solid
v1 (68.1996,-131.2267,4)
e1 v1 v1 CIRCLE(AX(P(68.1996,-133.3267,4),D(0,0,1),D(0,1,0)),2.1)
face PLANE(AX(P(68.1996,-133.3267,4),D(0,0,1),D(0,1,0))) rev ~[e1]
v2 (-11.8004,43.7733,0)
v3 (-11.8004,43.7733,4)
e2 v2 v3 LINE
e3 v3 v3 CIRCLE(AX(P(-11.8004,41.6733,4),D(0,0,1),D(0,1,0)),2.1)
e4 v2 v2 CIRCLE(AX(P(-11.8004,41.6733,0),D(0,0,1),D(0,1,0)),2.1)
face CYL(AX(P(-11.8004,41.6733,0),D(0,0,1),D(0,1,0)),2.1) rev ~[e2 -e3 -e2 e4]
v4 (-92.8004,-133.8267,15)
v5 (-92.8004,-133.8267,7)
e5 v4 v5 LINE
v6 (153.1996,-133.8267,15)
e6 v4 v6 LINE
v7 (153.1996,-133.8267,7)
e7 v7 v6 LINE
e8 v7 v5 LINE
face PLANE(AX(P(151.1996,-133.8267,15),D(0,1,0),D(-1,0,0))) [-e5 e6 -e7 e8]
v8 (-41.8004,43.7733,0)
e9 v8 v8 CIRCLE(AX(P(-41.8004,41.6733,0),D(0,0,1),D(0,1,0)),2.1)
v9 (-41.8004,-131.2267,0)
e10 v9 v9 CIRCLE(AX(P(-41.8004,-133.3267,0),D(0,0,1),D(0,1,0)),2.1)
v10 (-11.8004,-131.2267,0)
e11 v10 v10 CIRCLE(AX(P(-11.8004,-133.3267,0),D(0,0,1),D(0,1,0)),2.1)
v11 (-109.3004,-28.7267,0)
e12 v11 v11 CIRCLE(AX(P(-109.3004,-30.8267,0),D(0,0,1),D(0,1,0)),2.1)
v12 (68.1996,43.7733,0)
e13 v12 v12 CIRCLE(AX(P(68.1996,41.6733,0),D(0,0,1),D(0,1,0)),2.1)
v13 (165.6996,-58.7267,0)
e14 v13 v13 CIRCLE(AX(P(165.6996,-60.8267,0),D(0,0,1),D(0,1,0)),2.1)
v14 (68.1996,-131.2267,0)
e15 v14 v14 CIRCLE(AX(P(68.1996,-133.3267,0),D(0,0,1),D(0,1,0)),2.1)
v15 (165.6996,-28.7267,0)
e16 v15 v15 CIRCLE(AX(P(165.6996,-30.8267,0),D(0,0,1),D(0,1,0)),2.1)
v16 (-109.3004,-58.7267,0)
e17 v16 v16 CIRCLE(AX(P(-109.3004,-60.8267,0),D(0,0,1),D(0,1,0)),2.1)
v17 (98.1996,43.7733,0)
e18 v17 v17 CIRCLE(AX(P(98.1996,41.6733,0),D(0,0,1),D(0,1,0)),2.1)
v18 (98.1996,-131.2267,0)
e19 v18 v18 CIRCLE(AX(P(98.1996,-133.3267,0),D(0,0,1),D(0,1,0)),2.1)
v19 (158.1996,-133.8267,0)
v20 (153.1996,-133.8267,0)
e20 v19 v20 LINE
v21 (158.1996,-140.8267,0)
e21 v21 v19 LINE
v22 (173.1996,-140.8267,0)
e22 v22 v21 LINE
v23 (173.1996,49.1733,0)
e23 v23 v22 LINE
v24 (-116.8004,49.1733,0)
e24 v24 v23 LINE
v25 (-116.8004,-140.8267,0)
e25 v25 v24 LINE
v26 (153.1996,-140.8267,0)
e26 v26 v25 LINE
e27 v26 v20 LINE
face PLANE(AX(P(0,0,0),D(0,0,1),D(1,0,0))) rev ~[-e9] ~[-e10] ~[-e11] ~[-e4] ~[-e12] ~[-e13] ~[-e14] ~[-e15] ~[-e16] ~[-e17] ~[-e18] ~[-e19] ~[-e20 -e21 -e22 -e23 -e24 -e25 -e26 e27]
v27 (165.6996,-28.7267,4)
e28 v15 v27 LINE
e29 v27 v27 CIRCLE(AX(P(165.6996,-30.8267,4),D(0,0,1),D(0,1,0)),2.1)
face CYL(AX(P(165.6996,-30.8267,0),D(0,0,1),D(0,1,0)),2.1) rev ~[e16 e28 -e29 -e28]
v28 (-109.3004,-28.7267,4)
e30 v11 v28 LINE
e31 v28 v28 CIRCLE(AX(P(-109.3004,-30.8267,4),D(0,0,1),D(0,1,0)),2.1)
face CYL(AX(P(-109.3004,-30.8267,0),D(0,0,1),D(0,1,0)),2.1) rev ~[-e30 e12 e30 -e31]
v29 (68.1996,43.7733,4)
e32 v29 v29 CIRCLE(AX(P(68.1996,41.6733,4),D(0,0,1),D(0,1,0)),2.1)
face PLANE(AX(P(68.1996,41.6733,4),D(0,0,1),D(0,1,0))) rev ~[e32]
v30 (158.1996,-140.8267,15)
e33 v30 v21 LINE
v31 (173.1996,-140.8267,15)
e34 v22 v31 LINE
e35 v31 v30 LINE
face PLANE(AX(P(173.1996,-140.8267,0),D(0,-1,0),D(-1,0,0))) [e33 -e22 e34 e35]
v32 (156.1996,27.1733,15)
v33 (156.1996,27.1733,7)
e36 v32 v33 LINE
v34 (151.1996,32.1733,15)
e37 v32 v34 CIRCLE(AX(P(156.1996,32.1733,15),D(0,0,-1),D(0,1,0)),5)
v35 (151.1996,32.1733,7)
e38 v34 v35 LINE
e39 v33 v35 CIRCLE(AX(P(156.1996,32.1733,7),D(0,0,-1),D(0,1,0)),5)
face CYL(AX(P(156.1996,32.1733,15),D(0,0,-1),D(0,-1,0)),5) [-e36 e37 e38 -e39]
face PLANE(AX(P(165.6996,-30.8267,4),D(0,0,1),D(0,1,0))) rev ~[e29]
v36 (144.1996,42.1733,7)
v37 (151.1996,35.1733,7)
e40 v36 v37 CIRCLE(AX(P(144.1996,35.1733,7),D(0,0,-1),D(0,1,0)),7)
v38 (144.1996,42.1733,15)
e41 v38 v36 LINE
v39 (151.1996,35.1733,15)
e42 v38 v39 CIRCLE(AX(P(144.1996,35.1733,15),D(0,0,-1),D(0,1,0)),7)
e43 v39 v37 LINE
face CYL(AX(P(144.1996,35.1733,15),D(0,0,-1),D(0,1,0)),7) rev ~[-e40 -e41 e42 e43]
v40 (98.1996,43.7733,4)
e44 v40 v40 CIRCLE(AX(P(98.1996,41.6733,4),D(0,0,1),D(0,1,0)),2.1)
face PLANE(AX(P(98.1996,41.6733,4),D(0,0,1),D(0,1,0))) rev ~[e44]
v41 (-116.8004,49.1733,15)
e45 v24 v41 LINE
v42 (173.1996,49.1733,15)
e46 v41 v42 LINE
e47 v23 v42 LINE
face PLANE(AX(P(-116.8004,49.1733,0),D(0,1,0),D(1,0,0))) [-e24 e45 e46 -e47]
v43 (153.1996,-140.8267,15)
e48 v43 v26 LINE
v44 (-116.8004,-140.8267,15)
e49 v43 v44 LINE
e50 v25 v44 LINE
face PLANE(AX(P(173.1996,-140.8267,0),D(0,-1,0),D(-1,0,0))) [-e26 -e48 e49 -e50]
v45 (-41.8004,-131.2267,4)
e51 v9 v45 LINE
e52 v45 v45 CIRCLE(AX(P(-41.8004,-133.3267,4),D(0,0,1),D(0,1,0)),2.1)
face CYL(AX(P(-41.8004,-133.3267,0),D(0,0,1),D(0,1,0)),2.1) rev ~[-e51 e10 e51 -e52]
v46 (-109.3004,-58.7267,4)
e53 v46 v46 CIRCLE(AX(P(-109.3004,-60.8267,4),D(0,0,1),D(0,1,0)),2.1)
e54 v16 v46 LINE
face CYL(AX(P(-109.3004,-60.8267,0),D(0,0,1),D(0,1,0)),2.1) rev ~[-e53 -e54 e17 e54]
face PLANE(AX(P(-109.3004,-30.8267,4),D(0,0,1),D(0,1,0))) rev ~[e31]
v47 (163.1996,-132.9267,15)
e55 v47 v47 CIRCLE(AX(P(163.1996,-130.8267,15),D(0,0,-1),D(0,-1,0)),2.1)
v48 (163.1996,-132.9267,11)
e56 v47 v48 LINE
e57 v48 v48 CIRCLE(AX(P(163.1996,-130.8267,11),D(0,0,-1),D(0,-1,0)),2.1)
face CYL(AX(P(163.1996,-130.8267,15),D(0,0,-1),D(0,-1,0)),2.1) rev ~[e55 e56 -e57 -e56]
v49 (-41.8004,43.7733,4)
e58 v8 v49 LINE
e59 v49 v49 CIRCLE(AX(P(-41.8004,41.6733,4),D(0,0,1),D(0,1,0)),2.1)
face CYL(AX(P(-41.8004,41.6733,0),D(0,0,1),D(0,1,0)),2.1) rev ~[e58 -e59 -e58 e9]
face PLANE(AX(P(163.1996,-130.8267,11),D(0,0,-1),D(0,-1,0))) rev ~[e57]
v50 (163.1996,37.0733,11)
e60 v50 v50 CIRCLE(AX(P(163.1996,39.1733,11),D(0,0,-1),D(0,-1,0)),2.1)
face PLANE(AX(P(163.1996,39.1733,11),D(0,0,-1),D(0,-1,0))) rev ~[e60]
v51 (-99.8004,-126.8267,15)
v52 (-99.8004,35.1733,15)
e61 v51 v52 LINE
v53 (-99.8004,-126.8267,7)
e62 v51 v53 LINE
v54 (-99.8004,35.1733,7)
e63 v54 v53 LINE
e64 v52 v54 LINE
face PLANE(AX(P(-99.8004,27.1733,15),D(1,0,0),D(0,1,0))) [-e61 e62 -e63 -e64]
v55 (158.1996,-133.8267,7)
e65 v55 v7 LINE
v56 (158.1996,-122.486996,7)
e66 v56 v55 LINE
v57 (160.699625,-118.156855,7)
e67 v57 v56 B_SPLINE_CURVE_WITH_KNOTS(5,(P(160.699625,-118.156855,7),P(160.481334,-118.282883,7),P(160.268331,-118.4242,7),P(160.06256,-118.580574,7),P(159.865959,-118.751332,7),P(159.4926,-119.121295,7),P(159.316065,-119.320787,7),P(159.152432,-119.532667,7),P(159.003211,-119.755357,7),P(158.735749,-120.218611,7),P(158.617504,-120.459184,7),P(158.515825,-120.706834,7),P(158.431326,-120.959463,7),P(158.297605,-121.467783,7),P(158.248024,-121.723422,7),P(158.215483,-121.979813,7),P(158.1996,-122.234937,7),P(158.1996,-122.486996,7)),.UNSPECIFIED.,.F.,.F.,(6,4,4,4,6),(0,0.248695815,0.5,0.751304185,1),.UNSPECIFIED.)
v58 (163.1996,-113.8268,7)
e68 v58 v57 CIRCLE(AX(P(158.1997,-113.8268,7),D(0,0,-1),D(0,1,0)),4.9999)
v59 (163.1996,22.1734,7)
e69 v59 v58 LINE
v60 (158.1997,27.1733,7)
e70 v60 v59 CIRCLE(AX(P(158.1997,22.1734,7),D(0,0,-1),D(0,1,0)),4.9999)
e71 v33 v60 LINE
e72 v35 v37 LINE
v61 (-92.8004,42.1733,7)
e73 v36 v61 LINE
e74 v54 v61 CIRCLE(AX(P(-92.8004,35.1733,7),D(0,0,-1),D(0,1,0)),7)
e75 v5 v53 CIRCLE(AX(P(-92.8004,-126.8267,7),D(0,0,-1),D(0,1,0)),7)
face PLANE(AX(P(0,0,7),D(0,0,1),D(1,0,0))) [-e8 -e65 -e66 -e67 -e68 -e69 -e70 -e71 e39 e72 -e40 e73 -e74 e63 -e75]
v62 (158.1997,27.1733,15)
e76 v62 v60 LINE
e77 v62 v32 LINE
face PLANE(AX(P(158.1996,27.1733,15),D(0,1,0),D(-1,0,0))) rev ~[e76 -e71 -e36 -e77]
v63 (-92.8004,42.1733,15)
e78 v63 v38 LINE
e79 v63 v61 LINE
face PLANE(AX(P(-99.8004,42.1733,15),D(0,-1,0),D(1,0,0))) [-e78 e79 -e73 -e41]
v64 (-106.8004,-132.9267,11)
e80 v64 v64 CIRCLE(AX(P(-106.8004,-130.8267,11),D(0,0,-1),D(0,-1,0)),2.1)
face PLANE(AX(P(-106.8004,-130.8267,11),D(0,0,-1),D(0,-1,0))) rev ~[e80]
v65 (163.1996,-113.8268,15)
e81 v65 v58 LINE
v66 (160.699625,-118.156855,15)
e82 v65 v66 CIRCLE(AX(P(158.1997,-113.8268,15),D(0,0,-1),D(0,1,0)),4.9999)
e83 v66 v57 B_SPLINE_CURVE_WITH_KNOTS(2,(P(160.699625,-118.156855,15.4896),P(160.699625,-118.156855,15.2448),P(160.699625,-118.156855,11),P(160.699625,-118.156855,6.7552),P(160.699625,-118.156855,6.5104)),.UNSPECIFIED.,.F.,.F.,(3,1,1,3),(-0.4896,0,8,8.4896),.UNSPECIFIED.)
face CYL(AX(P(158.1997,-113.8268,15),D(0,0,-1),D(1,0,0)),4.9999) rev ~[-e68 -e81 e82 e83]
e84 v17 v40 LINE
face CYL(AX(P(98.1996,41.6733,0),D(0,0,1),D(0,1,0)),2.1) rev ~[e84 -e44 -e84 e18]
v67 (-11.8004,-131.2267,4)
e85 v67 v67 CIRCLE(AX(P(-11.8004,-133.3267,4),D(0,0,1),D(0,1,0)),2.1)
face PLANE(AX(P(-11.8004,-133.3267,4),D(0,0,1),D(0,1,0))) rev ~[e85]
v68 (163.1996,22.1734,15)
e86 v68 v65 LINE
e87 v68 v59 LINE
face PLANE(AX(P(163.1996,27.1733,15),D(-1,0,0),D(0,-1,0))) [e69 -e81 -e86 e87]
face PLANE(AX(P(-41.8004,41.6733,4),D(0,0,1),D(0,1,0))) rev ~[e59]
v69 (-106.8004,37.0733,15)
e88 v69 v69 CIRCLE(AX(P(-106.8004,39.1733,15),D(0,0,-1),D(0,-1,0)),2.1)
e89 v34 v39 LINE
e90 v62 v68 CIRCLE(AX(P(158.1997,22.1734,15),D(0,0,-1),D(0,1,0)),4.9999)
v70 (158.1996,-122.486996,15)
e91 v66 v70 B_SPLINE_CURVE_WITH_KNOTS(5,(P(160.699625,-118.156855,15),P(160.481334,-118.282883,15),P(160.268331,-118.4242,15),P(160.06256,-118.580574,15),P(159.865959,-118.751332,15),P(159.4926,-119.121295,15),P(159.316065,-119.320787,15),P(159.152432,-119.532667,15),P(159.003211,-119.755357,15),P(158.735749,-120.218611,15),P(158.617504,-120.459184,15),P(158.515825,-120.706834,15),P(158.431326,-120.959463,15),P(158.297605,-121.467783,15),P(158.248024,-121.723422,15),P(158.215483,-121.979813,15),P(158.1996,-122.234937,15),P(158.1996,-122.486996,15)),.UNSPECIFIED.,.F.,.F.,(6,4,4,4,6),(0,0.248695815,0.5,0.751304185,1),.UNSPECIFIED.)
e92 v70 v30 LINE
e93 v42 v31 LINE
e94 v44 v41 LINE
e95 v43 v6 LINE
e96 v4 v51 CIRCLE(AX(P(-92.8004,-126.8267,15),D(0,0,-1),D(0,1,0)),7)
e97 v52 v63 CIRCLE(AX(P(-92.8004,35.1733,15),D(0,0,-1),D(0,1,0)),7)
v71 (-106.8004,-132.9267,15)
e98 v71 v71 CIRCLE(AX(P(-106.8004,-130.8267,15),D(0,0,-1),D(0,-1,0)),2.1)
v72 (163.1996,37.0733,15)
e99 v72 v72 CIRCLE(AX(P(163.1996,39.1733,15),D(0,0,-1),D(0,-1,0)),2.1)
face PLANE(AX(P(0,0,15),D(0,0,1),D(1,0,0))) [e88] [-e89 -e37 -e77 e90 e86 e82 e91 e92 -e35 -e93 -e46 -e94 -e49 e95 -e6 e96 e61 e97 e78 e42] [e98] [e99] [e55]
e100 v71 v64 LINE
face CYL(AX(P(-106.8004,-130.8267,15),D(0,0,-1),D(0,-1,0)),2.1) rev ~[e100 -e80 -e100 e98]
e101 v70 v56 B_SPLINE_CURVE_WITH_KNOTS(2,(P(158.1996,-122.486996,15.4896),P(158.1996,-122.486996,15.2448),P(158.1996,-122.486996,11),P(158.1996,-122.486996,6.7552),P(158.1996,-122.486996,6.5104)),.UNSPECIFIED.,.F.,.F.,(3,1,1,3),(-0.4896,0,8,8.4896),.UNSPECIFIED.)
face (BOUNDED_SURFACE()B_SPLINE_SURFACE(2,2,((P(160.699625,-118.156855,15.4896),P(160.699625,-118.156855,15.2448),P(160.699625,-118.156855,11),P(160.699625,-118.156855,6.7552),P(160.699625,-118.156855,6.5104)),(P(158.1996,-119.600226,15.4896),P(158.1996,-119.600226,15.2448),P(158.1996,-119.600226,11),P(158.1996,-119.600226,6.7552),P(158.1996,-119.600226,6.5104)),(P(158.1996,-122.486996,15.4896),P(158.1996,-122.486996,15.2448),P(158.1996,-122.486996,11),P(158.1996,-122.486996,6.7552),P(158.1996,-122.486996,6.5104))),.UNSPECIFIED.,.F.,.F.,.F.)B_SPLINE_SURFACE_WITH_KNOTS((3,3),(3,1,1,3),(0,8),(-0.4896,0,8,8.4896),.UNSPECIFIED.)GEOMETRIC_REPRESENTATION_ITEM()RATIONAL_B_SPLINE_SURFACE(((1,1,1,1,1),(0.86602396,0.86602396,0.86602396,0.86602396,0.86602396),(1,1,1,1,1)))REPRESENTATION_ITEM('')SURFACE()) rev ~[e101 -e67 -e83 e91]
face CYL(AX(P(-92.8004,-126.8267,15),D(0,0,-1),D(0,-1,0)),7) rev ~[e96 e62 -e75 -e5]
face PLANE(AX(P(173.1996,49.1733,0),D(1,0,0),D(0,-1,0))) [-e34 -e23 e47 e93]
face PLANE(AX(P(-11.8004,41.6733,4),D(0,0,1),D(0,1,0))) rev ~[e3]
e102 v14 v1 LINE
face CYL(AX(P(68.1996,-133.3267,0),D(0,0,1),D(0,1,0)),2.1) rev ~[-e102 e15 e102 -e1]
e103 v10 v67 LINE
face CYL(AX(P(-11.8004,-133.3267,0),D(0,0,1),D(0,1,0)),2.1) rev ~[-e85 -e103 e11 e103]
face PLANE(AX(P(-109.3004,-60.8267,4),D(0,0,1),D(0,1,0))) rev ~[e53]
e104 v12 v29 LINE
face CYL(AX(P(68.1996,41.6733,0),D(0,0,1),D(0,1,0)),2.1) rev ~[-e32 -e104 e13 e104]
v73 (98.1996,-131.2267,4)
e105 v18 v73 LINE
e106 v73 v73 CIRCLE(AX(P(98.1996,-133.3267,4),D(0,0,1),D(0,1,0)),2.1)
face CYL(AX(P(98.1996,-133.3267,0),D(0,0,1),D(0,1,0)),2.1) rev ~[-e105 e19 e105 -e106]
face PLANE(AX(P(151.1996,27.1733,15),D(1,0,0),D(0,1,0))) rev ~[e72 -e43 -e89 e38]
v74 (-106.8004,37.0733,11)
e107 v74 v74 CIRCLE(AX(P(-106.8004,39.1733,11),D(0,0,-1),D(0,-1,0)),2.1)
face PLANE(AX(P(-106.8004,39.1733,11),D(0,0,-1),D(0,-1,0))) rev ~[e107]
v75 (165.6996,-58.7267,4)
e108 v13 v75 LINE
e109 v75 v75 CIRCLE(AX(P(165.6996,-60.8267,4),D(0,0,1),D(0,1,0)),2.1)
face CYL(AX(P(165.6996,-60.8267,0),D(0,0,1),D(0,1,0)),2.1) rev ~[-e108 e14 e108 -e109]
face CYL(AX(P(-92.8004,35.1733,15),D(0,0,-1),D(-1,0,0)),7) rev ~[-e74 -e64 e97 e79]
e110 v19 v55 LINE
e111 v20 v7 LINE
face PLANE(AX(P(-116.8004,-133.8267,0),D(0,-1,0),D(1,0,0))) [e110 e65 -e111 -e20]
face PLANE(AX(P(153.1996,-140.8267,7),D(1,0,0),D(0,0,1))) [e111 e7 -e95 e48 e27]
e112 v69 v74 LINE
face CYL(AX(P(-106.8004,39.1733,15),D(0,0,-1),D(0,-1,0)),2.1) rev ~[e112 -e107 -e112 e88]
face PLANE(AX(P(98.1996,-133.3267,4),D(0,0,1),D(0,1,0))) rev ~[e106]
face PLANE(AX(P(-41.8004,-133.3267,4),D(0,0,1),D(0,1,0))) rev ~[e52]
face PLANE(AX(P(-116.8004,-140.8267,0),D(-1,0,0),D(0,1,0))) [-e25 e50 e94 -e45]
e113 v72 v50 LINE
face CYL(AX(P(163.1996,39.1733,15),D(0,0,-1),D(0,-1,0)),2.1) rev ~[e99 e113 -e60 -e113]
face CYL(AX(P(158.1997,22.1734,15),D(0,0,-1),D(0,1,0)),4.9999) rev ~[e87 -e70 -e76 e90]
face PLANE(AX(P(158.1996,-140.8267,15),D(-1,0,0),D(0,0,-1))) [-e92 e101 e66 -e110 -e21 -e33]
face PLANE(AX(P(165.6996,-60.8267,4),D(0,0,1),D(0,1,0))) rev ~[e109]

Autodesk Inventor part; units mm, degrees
ref_plane "YZ Plane" through (0, 0, 0) normal (1, 0, 0) x (0, 1, 0)
sketch "スケッチ1" plane through (0, 0, 0) normal (0, 0, 1) x (1, 0, 0)
  line L0 (-116.8004, 49.1733) -> (173.1996, 49.1733)
  line L1 (173.1996, 49.1733) -> (173.1996, -140.8267)
  line L2 (173.1996, -140.8267) -> (-116.8004, -140.8267)
  line L3 (-116.8004, -140.8267) -> (-116.8004, 49.1733)
  point P0 (0, 0)
  dimension "d0" = 290
  dimension "d1" = 190
extrude "押し出し1" add sketch "スケッチ1" along normal blind 15
sketch "スケッチ2" plane through (0, 0, 15) normal (0, 0, 1) x (1, 0, 0)
  line L0 (-111.8004, 42.1733) -> (163.1996, 42.1733)
  line L1 (163.1996, 42.1733) -> (163.1996, -133.8267)
  line L2 (163.1996, -133.8267) -> (-111.8004, -133.8267)
  line L3 (-111.8004, -133.8267) -> (-111.8004, 42.1733)
  line L4 (-111.8004, 27.1733) -> (-99.8004, 27.1733)
  line L5 (-99.8004, 27.1733) -> (-99.8004, 42.1733)
  line L6 (-116.8004, 49.1733) -> (-116.8004, -140.8267) projected
  line L7 (-116.8004, -140.8267) -> (173.1996, -140.8267) projected
  line L8 (173.1996, 49.1733) -> (-116.8004, 49.1733) projected
  line L9 (28.1996, -45.8267) -> (-116.8004, -45.8267)
  line L10 (28.1996, -45.8267) -> (28.1996, 49.1733)
  line L11 (168.1996, 27.1733) -> (158.1996, 27.1733)
  line L12 (158.1996, 27.1733) -> (158.1996, 42.1733)
  line L13 (-111.8004, -118.8267) -> (-99.8004, -118.8267)
  line L14 (-99.8004, -118.8267) -> (-99.8004, -133.8267)
  line L15 (158.1996, -118.8267) -> (158.1996, -133.8267)
  line L16 (168.1996, -118.8267) -> (158.1996, -118.8267)
  line L17 (-99.8004, 27.1733) -> (-99.8004, -118.8267)
  line L18 (158.1996, 27.1733) -> (151.1996, 27.1733)
  line L19 (151.1996, 27.1733) -> (151.1996, 42.1733)
  line L20 (158.1996, -118.8267) -> (151.1996, -118.8267)
  line L21 (151.1996, -118.8267) -> (151.1996, -133.8267)
  point P0 (0, 0)
  point P1 (163.1996, -118.8267)
  point P2 (163.1996, 27.1733)
  point P3 (158.1996, 42.1733)
  point P4 (-111.8004, -118.8267)
  point P5 (158.1996, -133.8267)
  dimension "d4" = 15
  dimension "d5" = 275
  dimension "d6" = 5
  dimension "d7" = 7
  dimension "d8" = 7
  dimension "d9" = 12
  dimension "d15" = 7
ref_plane "作業平面1" through (28.1996, -140.8267, 0) normal (-1, 0, 0) x (0, 0, 1)
ref_plane "作業平面2" through (-116.8004, -45.8267, 0) normal (0, 1, 0) x (1, 0, 0)
extrude "押し出し2" cut sketch "スケッチ2" against normal blind 8 contours L0 L10 L9 L17 L5 | L0 L19 L18 L11 L1 L16 L20 L21 L2 L14 L17 L9 L10 | L21 L20 L15 L2
sketch "スケッチ3" plane through (-116.8004, -140.8267, 0) normal (0, -1, 0) x (1, 0, 0)
  line L0 (275, 15) -> (275, 7) projected
  line L1 (275, 7) -> (17, 7) projected
  line L2 (275, 7) -> (270, 7)
  line L3 (270, 7) -> (270, 15)
  line L4 (0, 15) -> (290, 15) projected
  line L5 (270, 7) -> (270, 0)
  line L6 (290, 0) -> (0, 0) projected
  line L7 (275, 15) -> (275, 7) projected
  line L8 (275, 0) -> (275, 7)
  point P0 (116.8004, 0)
  dimension "d12" = 5
extrude "押し出し3" cut sketch "スケッチ3" against normal blind 7
sketch "スケッチ4" plane through (0, 0, 15) normal (0, 0, 1) x (1, 0, 0)
  circle A0 centre (-106.8004, 39.1733) radius 2.25 projected
  circle A1 centre (163.1996, 39.1733) radius 2.25 projected
  circle A2 centre (163.1996, -130.8267) radius 2.25 projected
  line L0 (153.1996, -133.8267) -> (-99.8004, -133.8267) projected
  line L1 (-99.8004, -133.8267) -> (-99.8004, 42.1733) projected
  line L2 (-99.8004, 42.1733) -> (151.1996, 42.1733) projected
  line L3 (151.1996, 42.1733) -> (151.1996, 27.1733) projected
  line L4 (151.1996, 27.1733) -> (163.1996, 27.1733) projected
  line L5 (163.1996, 27.1733) -> (163.1996, -118.8267) projected
  line L6 (163.1996, -118.8267) -> (158.1996, -118.8267) projected
  line L7 (158.1996, -118.8267) -> (158.1996, -140.8267) projected
  line L8 (-116.8004, -140.8267) -> (153.1996, -140.8267) projected
  line L9 (173.1996, -140.8267) -> (173.1996, 49.1733) projected
  line L10 (173.1996, 49.1733) -> (-116.8004, 49.1733) projected
  line L11 (-116.8004, 49.1733) -> (-116.8004, -140.8267) projected
  line L12 (158.1996, -140.8267) -> (173.1996, -140.8267) projected
  circle A3 centre (-106.8004, -130.8267) radius 2.25 projected
  line L13 (153.1996, -140.8267) -> (153.1996, -133.8267) projected
  point P0 (0, 0)
hole "穴1" at (-106.8004, 39.1733, 15) at (-106.8004, -130.8267, 15) at (163.1996, -130.8267, 15) at (163.1996, 39.1733, 15) direction (0, 0, -1) diameter 4.2 depth 4
fillet "フィレット2" radius 7 3 edges at (-99.8004, 42.1733, 11) (-99.8004, -133.8267, 11) (151.1996, 42.1733, 11)
fillet "フィレット3" radius 5 4 edges at (151.1996, 27.1733, 11) (163.1996, 27.1733, 11) (158.1996, -118.8267, 11) (163.1996, -118.8267, 11)
sketch "スケッチ5" plane through (0, 0, 0) normal (0, 0, -1) x (-1, 0, 0)
  line L0 (-143.1996, 41.1733) -> (92.8004, 41.1733) projected
  line L1 (92.8004, -133.8267) -> (-143.1996, -133.8267) projected
  line L2 (99.8004, 34.1733) -> (99.8004, -126.8267) projected
  line L3 (-163.1996, 22.1733) -> (-163.1996, -113.8267) projected
  line L4 (-173.1996, -140.8267) -> (-173.1996, 49.1733) projected
  line L5 (-28.1996, 87.1733) -> (-28.1996, -178.8267) projected
  line L6 (-231.1996, -45.8267) -> (174.8004, -45.8267) projected
  line L7 (-173.1996, 49.1733) -> (116.8004, 49.1733) projected
  point P0 (0, 0)
  point P1 (-98.1996, 41.6733)
  point P2 (41.8004, 41.6733)
  point P3 (-98.1996, -133.3267)
  point P4 (41.8004, -133.3267)
  point P5 (-165.6996, -30.8267)
  point P6 (-165.6996, -60.8267)
  point P7 (109.3004, -30.8267)
  point P8 (109.3004, -60.8267)
  point P9 (-68.1996, 41.6733)
  point P10 (11.8004, 41.6733)
  point P11 (-68.1996, -133.3267)
  point P12 (11.8004, -133.3267)
  dimension "d26" = 75
  dimension "d27" = 7.5
  dimension "d28" = 15
  dimension "d29" = 7.5
  dimension "d30" = 30
  dimension "d31" = 7.5
hole "穴2" at (98.1996, 41.6733, 0) at (-41.8004, 41.6733, 0) at (98.1996, -133.3267, 0) at (-41.8004, -133.3267, 0) at (165.6996, -30.8267, 0) at (165.6996, -60.8267, 0) at (-109.3004, -30.8267, 0) at (-109.3004, -60.8267, 0) at (68.1996, 41.6733, 0) at (-11.8004, 41.6733, 0) at (68.1996, -133.3267, 0) at (-11.8004, -133.3267, 0) direction (0, 0, 1) diameter 4.2 depth 4
properties part number "iPadHolder"
